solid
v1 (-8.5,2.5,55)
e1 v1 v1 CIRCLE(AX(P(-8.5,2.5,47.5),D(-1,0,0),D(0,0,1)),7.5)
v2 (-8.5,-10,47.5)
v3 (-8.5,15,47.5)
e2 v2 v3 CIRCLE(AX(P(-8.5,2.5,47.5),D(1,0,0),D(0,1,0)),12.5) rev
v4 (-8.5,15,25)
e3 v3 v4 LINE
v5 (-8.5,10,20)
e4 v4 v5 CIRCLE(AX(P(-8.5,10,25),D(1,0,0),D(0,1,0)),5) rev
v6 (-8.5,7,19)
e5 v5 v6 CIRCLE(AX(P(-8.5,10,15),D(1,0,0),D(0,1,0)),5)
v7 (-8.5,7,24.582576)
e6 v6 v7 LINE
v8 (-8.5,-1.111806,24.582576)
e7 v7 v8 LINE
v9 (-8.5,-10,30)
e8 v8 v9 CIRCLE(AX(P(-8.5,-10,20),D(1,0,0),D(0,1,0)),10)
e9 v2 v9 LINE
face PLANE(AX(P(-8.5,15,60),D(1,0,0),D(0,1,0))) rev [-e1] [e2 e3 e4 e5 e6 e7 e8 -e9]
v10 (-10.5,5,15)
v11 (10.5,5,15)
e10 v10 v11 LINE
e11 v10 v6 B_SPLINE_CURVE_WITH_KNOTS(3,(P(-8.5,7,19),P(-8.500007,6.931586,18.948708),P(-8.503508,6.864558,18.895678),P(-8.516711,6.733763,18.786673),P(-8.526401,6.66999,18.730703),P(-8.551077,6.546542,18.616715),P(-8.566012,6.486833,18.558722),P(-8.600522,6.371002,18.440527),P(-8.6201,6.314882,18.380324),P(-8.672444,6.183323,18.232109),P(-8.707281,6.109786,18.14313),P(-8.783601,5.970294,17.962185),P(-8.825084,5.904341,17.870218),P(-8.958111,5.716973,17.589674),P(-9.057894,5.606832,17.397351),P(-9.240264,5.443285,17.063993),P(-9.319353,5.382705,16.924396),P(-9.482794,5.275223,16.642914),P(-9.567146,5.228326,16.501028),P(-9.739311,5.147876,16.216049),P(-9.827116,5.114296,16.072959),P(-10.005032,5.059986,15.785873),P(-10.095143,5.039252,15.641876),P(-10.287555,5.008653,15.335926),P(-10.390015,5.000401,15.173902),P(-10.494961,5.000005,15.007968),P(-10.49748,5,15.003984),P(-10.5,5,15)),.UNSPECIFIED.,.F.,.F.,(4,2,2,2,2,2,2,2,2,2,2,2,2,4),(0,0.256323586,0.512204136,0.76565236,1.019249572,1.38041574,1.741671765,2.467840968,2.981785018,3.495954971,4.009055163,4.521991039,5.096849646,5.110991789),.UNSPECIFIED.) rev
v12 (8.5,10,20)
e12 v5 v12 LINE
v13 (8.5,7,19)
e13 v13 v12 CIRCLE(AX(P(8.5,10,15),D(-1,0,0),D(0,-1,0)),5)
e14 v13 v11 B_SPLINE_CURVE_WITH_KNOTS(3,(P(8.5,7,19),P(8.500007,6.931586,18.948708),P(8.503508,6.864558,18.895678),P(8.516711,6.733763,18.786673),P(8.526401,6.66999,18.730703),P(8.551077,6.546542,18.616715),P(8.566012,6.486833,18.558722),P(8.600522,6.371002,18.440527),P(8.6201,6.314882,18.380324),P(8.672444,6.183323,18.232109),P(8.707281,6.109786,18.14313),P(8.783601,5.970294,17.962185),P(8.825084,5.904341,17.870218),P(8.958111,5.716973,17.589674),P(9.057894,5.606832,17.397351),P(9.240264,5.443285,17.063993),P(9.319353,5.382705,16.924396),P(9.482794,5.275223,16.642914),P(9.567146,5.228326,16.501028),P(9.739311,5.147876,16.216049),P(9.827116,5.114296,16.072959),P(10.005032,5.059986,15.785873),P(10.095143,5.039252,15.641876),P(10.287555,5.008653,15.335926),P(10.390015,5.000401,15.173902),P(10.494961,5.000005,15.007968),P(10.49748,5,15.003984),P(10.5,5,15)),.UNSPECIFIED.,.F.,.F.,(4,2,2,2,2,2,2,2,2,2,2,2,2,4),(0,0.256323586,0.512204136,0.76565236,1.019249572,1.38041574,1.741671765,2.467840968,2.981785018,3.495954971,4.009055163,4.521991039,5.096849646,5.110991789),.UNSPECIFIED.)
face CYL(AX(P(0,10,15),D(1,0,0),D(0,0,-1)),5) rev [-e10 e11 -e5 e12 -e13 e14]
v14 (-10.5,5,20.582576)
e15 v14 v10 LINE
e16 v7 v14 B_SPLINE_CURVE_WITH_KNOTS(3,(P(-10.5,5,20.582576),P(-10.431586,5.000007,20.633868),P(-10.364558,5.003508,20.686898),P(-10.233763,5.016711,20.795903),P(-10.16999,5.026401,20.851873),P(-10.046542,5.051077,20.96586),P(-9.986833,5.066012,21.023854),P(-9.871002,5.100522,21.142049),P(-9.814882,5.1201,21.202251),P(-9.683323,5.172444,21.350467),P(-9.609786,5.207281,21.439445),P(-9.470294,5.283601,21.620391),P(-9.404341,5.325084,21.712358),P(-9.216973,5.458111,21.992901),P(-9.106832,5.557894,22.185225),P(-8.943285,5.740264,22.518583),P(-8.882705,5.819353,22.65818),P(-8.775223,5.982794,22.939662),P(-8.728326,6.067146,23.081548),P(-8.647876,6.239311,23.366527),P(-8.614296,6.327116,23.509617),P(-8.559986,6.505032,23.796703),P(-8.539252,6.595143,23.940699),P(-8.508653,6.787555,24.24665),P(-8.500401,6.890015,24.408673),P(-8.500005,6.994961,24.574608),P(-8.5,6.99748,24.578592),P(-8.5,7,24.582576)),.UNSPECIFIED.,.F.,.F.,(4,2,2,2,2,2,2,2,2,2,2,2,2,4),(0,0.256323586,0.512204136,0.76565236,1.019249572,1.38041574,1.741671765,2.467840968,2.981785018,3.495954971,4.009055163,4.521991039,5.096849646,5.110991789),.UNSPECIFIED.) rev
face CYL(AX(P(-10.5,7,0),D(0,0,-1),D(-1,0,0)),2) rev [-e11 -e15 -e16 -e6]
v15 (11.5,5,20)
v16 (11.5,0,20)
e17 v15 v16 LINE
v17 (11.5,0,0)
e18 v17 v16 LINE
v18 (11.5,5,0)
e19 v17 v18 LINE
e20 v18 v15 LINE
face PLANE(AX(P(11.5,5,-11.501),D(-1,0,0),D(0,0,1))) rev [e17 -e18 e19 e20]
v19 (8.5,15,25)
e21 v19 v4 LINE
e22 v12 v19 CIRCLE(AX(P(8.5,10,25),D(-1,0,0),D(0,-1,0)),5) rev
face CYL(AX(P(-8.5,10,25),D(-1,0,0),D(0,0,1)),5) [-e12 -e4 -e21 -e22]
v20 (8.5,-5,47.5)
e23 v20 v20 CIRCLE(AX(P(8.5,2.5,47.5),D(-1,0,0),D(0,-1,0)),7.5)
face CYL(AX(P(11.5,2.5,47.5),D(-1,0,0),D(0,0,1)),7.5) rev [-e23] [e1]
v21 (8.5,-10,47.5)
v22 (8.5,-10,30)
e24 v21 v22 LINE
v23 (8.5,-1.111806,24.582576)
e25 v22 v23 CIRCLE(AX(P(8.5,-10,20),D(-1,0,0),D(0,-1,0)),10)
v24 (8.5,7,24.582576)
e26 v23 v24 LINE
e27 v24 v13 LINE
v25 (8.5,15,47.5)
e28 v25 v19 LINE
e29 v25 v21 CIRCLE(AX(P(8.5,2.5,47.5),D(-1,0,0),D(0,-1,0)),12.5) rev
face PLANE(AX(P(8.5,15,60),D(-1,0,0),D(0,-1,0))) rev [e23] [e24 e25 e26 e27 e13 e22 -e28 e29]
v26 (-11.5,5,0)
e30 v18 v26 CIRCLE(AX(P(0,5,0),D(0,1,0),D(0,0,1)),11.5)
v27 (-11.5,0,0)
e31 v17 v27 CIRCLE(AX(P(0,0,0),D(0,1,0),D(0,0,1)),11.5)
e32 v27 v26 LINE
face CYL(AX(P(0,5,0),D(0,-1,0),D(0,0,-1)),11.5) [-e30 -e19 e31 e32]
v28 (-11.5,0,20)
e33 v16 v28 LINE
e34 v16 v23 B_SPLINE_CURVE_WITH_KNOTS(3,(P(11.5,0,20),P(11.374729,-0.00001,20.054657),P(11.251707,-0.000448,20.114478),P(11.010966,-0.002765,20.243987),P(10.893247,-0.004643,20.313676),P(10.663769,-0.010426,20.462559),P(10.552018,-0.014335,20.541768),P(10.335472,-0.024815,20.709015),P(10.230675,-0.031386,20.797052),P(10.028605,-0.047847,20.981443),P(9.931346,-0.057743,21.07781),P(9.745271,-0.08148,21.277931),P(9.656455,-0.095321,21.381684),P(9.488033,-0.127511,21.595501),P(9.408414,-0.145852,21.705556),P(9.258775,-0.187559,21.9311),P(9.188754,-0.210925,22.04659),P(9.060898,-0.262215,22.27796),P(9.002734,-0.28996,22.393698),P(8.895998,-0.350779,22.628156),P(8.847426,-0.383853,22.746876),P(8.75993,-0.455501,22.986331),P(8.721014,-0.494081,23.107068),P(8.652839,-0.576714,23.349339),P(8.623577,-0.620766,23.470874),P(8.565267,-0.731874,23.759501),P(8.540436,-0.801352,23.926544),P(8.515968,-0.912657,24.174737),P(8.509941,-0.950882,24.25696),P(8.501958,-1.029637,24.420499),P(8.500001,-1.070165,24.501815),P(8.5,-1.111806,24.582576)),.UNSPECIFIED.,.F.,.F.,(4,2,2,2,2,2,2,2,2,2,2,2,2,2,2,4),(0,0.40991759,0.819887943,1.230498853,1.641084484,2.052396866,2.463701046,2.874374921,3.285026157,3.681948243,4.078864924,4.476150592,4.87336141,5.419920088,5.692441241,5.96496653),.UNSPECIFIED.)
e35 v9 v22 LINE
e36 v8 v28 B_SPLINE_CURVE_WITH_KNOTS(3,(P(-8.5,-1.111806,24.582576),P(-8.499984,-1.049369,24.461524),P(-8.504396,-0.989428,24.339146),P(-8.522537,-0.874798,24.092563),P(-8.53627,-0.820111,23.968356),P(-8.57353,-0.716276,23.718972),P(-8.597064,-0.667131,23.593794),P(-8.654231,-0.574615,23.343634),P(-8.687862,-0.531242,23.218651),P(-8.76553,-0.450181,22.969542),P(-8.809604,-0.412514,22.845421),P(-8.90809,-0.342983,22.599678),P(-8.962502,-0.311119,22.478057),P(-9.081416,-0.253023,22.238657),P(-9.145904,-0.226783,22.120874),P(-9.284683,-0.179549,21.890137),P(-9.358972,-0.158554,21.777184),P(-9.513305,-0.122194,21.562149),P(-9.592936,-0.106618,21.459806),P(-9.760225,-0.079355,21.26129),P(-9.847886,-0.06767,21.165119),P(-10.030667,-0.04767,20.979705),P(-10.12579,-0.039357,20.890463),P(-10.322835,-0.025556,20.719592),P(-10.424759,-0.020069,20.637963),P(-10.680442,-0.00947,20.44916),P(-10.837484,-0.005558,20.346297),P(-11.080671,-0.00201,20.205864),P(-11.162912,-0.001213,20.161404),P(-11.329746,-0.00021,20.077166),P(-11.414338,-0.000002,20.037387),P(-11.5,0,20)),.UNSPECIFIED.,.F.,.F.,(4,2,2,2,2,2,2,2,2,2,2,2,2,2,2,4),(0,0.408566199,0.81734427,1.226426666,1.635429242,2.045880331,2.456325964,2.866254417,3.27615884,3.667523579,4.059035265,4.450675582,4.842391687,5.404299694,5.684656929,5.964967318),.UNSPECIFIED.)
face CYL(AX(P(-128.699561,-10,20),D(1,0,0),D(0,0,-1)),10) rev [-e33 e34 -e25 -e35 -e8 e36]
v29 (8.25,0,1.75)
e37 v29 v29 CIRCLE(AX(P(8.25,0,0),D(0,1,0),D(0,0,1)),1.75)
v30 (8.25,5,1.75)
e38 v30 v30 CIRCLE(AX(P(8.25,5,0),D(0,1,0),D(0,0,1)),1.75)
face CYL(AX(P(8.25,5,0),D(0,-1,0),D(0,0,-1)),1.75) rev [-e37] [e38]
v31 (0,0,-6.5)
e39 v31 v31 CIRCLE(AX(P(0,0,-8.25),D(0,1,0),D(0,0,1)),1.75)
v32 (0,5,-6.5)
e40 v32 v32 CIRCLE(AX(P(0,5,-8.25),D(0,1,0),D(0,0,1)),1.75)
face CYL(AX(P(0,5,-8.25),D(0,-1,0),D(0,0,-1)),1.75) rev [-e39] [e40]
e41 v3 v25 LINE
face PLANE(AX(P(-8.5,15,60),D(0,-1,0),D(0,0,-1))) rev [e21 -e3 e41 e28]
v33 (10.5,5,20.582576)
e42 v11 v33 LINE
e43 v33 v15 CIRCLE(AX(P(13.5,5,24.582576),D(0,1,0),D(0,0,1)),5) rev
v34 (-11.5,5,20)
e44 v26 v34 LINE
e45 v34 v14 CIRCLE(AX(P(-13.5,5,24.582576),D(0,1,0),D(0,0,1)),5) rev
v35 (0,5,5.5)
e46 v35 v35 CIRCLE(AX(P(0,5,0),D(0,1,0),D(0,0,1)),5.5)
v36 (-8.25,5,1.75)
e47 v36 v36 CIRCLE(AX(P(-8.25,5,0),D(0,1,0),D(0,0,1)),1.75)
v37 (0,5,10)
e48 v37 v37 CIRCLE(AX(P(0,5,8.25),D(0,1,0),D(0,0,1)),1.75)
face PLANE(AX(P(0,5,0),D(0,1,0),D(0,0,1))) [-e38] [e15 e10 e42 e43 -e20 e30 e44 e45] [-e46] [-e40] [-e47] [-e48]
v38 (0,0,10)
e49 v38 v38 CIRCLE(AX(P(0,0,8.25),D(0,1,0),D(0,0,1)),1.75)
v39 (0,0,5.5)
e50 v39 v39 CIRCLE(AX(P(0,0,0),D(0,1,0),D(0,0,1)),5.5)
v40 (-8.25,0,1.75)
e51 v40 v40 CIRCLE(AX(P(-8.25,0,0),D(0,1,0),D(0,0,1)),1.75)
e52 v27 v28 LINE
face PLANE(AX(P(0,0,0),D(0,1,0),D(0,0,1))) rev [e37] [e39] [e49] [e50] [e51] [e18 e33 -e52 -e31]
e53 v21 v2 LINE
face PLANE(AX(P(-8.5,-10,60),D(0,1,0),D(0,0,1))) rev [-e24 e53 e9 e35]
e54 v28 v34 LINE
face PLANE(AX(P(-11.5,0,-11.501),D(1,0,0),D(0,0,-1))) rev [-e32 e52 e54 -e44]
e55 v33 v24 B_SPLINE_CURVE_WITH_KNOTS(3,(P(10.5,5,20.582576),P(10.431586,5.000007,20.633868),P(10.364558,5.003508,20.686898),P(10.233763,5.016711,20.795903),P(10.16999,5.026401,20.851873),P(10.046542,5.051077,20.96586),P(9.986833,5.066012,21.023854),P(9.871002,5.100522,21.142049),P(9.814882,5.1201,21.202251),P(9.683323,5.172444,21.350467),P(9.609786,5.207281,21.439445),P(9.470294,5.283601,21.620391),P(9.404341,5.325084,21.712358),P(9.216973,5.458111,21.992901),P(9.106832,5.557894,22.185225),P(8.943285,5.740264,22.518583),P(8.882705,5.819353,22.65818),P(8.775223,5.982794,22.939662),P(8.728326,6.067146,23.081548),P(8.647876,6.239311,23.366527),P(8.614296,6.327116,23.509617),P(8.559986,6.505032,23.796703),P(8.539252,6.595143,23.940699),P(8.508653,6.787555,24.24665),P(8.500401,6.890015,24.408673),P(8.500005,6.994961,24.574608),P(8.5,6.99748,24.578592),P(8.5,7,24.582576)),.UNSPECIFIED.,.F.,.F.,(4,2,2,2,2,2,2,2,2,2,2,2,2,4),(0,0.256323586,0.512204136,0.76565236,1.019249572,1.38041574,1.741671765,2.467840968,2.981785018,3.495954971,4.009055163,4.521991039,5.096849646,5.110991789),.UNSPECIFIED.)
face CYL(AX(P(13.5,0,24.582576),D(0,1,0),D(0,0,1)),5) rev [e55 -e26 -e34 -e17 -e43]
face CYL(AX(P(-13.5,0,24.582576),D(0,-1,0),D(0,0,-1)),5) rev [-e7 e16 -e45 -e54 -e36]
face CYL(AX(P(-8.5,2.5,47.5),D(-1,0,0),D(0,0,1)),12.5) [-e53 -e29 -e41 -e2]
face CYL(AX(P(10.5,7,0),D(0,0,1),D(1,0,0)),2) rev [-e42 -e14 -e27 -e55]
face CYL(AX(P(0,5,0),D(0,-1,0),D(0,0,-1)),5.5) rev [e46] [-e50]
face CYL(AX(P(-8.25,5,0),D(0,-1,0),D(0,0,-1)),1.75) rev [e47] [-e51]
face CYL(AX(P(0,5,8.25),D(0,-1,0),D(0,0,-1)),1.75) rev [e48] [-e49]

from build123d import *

# Parameters (mm, degrees)
SKETCH1_R           = 11.5
SKETCH1_R_2         = 5.5
SKETCH1_R_3         = 1.75
SKETCH1_R_4         = 1.7499999999999998
EXTRUDE1_DEPTH      = 5
EXTRUDE2_DEPTH      = 40
FILLET1_RADIUS      = 12.5
FILLET1_LENGTH      = 17
EXTRUDE4_REACH      = 46.241
EXTRUDE4_END_RADIUS = 11.5
SKETCH4_W           = 23
SKETCH4_H           = 5
SKETCH5_R           = 7.499999999999999
EXTRUDE5_DEPTH      = 66
FILLET2_R           = 5
EXTRUDE6_DEPTH      = 66
EXTRUDE6_DEPTH_BACK = 66
FILLET3_R           = 5
FILLET4_R           = 2


# Some blends are built 0.0001 mm under size
with BuildPart() as part:
    # Sketch1 → Extrude1 (new body)
    with BuildSketch(Plane(origin=(0, 0, 0), x_dir=(1, 0, 0), z_dir=(0, 1, 0))):
        with Locations(Location((0, 0, 0), (0, 0, 270))):
            Circle(SKETCH1_R)
        with Locations(Location((0, 0, 0), (0, 0, 270))):
            Circle(SKETCH1_R_2, mode=Mode.SUBTRACT)
        with Locations(Location((-8.25, 0, 0), (0, 0, 270))):
            Circle(SKETCH1_R_3, mode=Mode.SUBTRACT)
        with Locations(Location((2.88e-14, 8.249999999999998, 0), (0, 0, 270))):
            Circle(SKETCH1_R_3, mode=Mode.SUBTRACT)
        with Locations(Location((8.25, -5.761e-14, 0), (0, 0, 270))):
            Circle(SKETCH1_R_4, mode=Mode.SUBTRACT)
        with Locations(Location((-8.641e-14, -8.25, 0), (0, 0, 270))):
            Circle(SKETCH1_R_4, mode=Mode.SUBTRACT)
    extrude(amount=EXTRUDE1_DEPTH)



with BuildPart() as body_2:
    # Sketch2 → Extrude2 (new body)
    with BuildSketch(Plane.XY.offset(20)):
        Polygon((-8.5, 15.000000000000002), (8.499999999999996, 15.000000000000002), (8.500000000000002, -10), (-8.499999999999998, -10), align=None)
    extrude(amount=EXTRUDE2_DEPTH)

    # Fillet1: full round fillet: the end face becomes a half cylinder, R = half its width
    fillet1_face = Plane((0, 2.5, 60), x_dir=(1, 0, 0), z_dir=(0, 0, 1))  # on the end face: x along it, z out of the body
    fillet1_slab = fillet1_face.offset(-FILLET1_RADIUS / 2) * Box(FILLET1_LENGTH, 2 * FILLET1_RADIUS, FILLET1_RADIUS, mode=Mode.PRIVATE)  # the body's end, R deep
    fillet1_round = Plane((0, 2.5, 47.5), x_dir=(0, 0, 1), z_dir=(1, 0, 0)) * Cylinder(FILLET1_RADIUS, FILLET1_LENGTH, mode=Mode.PRIVATE)  # its axis R under the face
    add(fillet1_slab - fillet1_round, mode=Mode.SUBTRACT)


with BuildPart() as part_1:
    add(part.part)

    add(body_2.part)  # Extrude4 merges body 2
    # Extrude4: up to this cylinder (the profile starts outside it)
    extrude4_end = Plane(origin=(0, 2.5, 0), z_dir=(0, -1, 0)) * Cylinder(EXTRUDE4_END_RADIUS, 116.482, mode=Mode.PRIVATE)
    # Sketch4 → Extrude4 (add, up to the surface)
    with BuildSketch(Plane(origin=(0, 0, 20), x_dir=(-1, 0, 0), z_dir=(0, 0, -1)), mode=Mode.PRIVATE) as extrude4_sk1:
        with Locations((0, 2.5)):
            Rectangle(SKETCH4_W, SKETCH4_H)
    extrude4_tool1 = extrude(extrude4_sk1.sketch, amount=EXTRUDE4_REACH, mode=Mode.PRIVATE) - extrude4_end
    add(extrude4_tool1.solids().sort_by_distance((0, 2.5, 20))[0])

    # Sketch5 → Extrude5 (cut, through all)
    with BuildSketch(Plane.ZY.offset(8.499999999999998)):
        with Locations((47.5, 2.5000000000000004)):
            Circle(SKETCH5_R)
    extrude(amount=-EXTRUDE5_DEPTH, mode=Mode.SUBTRACT)

    # Fillet2
    fillet2_edges = [part_1.edges().sort_by_distance(p)[0] for p in [
        (0, 5, 20),
    ]]
    fillet(fillet2_edges, radius=FILLET2_R)
    fillet2_2_edges = [part_1.edges().sort_by_distance(p)[0] for p in [
        (-1.78e-15, 15.000000000000002, 20),
    ]]
    fillet(fillet2_2_edges, radius=FILLET2_R - 0.0001)  # a hair under: the kernel refuses the full size

    # Sketch6 → Extrude6 (cut, two sides: drawn at the far end of the back side and taken through both)
    with BuildSketch(Plane.ZY.offset(8.499999999999998).offset(-EXTRUDE6_DEPTH_BACK)):
        with BuildLine():
            Line((-86.89685237405806, -7.595e-14), (20, 0))
            ThreePointArc((20, 0), (27.071067811865476, -2.9289321881345254), (30, -10.000000000000002))
            Line((30, -10.000000000000002), (29.999999999999982, -116.89685237405806))
            Line((29.999999999999982, -116.89685237405806), (-121.17497840238745, -268.0718307764456))
            Line((-121.17497840238745, -268.0718307764456), (-238.0718307764455, -151.1749784023876))
            Line((-238.0718307764455, -151.1749784023876), (-86.89685237405806, -7.595e-14))
        make_face()
    extrude(amount=EXTRUDE6_DEPTH + EXTRUDE6_DEPTH_BACK, mode=Mode.SUBTRACT)

    # Fillet3
    # the kernel refuses this fillet: 5 mm, written as the material it adds along each edge
    with BuildSketch(Plane(origin=(8.499999999999998, 5, 20), x_dir=(0, 0, 1), z_dir=(2.1e-16, -1, 0))) as fillet3_piece_1_section:
        with BuildLine():
            CenterArc((4.5825756949558425, -5), FILLET3_R, 90, 66.4218215217982)
            Line((0, -3.0000000000000018), (0, 0))
            Line((0, 0), (4.5825756949558425, 0))
        make_face()
    fillet3_piece_1 = extrude(amount=16.45643923738961, mode=Mode.PRIVATE)
    fillet3_piece_1 = fillet3_piece_1 - Plane(origin=(9.308333267064283, -10.000000000000004, 19.999999999999996), x_dir=(0, 1, 3.6e-16), z_dir=(1, 0, 0)) * Cylinder(10.000000000000004, 52, mode=Mode.PRIVATE)
    add(fillet3_piece_1)
    with BuildSketch(Plane(origin=(-8.499999999999998, -11.456439237389606, 20), x_dir=(0, 0, 1), z_dir=(-7e-17, 1, 0))) as fillet3_piece_2_section:
        with BuildLine():
            CenterArc((4.5825756949558425, -5), FILLET3_R, 90, 66.4218215217982)
            Line((0, -3.0000000000000018), (0, 0))
            Line((0, 0), (4.5825756949558425, 0))
        make_face()
    fillet3_piece_2 = extrude(amount=16.456439237389606, mode=Mode.PRIVATE)
    fillet3_piece_2 = fillet3_piece_2 - Plane(origin=(-8.583224495068782, -10.000000000000004, 19.999999999999996), x_dir=(0, 1, 3.6e-16), z_dir=(1, 0, 0)) * Cylinder(10.000000000000004, 52, mode=Mode.PRIVATE)
    add(fillet3_piece_2)

    # Fillet4
    fillet4_edges = [part_1.edges().sort_by_distance(p)[0] for p in [
        (-8.5, 5, 19.791287847478),
        (8.5, 5, 19.791287847478),
    ]]
    fillet(fillet4_edges, radius=FILLET4_R)


solid = part_1.part
